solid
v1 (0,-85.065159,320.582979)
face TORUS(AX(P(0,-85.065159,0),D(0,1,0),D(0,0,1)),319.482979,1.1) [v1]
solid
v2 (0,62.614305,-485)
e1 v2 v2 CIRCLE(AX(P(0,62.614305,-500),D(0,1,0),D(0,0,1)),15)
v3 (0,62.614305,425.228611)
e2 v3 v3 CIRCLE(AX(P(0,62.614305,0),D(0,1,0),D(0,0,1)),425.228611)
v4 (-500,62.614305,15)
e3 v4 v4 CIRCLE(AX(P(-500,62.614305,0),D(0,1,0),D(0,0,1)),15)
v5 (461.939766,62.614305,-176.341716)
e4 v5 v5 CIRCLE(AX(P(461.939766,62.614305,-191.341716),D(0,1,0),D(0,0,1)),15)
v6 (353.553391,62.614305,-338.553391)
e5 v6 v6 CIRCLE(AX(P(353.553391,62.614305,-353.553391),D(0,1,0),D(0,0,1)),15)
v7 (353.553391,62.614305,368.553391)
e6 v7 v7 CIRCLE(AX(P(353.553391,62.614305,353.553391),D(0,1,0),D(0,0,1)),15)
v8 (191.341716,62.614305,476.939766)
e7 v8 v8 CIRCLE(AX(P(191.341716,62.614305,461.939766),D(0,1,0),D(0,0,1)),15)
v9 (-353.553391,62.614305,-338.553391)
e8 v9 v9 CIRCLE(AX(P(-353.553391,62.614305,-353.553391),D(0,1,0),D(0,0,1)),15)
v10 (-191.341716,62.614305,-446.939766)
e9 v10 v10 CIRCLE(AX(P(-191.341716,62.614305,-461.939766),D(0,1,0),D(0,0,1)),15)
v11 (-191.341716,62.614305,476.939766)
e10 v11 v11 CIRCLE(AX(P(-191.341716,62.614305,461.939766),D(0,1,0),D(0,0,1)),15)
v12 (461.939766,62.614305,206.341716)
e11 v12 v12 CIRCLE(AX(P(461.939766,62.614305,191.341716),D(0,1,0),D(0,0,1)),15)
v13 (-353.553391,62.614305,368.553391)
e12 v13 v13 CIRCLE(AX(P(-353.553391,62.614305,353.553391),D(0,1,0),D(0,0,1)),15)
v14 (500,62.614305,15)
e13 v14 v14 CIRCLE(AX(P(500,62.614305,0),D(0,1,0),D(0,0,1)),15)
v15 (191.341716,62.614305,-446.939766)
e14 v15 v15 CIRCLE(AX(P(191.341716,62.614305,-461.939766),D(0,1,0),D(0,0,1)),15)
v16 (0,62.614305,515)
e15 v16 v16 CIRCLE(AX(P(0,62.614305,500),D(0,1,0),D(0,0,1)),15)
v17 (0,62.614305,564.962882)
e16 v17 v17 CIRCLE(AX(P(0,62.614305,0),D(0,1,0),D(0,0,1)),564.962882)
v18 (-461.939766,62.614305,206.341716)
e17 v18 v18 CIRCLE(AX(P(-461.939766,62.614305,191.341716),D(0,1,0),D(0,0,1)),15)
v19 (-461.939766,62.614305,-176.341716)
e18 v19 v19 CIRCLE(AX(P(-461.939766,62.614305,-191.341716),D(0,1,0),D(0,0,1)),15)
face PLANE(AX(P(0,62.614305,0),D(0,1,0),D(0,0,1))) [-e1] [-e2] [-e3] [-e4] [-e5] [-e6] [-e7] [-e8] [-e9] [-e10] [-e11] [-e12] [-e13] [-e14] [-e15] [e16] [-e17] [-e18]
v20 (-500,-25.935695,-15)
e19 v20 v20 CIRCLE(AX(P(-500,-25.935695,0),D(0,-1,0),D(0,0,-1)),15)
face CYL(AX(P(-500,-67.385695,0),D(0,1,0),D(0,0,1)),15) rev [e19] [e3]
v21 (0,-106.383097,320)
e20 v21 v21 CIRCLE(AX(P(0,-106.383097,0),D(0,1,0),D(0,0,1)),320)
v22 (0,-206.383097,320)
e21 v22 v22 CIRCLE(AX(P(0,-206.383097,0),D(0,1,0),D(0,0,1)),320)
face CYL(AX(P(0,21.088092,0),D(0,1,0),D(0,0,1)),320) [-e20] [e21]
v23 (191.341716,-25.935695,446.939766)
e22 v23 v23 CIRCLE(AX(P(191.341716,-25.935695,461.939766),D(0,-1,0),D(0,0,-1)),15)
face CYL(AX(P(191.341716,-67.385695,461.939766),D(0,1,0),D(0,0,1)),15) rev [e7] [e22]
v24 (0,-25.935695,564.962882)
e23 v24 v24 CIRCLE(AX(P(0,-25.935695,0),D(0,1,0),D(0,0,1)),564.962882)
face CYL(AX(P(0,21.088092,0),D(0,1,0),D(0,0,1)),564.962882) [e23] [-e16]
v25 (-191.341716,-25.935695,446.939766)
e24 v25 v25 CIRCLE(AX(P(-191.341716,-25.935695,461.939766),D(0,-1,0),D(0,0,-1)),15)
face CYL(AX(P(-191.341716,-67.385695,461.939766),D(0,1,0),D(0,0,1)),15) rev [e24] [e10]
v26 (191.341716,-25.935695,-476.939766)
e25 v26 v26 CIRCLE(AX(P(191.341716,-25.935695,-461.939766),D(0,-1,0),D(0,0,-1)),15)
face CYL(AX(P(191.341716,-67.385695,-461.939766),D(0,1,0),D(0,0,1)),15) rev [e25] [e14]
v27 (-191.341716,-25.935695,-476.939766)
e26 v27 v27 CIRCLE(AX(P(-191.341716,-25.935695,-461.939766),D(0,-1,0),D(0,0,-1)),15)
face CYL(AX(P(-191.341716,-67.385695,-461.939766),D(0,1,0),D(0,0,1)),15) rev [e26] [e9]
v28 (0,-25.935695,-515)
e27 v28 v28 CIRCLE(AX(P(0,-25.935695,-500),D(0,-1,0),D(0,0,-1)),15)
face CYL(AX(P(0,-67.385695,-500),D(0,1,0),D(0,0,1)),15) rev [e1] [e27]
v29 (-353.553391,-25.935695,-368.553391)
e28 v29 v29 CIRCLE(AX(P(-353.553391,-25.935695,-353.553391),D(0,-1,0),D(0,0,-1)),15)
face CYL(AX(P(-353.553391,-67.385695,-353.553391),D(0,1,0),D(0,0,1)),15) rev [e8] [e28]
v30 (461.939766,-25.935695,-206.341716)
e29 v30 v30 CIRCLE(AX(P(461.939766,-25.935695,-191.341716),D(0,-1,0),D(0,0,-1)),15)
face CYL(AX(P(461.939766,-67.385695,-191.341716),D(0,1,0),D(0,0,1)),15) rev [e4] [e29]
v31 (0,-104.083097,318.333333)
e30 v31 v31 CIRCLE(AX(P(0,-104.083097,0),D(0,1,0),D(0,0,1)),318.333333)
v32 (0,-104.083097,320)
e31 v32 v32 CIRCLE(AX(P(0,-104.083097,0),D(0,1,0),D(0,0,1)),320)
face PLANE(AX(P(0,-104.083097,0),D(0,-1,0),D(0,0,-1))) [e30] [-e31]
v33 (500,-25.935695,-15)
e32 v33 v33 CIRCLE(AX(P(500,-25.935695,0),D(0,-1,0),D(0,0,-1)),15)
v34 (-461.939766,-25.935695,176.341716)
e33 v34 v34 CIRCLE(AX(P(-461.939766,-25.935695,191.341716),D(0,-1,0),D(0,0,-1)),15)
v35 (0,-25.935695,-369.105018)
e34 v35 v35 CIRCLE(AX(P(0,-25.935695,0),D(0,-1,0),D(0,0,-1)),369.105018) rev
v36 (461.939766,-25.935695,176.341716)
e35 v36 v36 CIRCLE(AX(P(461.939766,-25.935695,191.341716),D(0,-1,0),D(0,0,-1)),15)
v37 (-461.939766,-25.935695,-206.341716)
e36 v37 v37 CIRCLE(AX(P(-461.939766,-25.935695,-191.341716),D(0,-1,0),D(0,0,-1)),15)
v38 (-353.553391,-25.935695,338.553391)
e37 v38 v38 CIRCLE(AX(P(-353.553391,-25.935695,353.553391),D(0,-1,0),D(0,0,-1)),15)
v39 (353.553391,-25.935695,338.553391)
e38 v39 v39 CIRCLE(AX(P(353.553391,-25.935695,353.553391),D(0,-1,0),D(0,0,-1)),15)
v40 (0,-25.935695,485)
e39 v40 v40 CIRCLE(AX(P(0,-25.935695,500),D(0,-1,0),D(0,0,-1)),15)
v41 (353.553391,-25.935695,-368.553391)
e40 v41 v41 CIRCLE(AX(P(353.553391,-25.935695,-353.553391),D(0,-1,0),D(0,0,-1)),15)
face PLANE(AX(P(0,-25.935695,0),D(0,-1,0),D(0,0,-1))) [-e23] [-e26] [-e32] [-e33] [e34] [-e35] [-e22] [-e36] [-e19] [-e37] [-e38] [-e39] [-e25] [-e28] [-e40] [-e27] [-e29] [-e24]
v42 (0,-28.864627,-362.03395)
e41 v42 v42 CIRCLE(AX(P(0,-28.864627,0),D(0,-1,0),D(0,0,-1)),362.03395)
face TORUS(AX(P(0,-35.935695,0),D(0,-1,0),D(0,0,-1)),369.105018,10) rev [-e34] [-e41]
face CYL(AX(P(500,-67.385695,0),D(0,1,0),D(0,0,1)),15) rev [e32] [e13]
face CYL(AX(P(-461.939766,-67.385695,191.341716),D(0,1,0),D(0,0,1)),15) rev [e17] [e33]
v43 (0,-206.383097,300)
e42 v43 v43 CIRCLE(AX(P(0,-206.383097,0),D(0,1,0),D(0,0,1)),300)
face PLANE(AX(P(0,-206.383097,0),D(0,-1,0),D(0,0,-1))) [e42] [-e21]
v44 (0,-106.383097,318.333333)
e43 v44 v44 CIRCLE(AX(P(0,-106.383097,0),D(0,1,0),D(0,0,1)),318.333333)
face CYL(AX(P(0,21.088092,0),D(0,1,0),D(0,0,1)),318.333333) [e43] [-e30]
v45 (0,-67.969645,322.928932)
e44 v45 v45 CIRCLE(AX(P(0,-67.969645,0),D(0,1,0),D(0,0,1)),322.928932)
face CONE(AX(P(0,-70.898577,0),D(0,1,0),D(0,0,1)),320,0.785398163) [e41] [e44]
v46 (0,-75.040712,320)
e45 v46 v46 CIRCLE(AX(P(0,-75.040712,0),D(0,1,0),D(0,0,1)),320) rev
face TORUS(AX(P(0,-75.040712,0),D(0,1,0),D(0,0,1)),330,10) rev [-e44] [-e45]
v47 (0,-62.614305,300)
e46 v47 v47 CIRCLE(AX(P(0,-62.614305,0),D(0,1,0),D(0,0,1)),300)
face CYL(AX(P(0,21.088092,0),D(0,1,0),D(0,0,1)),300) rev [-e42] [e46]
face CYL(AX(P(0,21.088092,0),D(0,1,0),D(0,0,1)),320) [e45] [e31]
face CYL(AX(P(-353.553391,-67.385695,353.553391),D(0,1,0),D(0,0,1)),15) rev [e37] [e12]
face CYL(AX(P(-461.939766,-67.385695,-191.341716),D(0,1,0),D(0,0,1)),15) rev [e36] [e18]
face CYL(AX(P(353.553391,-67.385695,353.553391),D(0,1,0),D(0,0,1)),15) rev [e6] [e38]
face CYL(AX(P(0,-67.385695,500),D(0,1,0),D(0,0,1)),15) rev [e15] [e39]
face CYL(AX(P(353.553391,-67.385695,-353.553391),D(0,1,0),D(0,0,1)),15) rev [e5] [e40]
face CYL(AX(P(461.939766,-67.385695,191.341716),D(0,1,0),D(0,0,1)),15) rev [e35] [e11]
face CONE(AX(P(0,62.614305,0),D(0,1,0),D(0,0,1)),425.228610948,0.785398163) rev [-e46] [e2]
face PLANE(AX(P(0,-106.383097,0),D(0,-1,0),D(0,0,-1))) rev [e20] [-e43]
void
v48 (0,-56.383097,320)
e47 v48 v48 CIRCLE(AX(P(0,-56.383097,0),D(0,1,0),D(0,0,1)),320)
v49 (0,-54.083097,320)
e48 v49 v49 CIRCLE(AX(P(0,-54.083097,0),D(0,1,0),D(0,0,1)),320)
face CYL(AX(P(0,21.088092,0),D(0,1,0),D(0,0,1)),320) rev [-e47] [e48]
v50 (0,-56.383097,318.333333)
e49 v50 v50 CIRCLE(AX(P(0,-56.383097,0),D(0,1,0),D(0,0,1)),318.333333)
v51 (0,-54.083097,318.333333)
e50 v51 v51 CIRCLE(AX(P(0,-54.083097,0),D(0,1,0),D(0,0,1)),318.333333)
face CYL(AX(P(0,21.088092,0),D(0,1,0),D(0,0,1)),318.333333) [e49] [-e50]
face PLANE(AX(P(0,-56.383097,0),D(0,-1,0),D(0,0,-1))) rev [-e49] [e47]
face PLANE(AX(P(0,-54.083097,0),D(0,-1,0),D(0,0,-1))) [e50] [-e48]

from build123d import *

# Parameters (mm, degrees)
SKETCH1_W               = 1.666666667
SKETCH1_H               = 2.3
SKETCH2_R               = 15
CUT_EXTRUDE2_DEPTH      = 130
FILLET1_R               = 10
SKETCH3_W               = 40
SKETCH3_H               = 40
BOSS_EXTRUDE1_DEPTH     = 60
SKETCH4_R               = 10
CUT_EXTRUDE3_DEPTH      = 340
FILLET2_R               = 20
FILLET3_R               = 10
CUT_EXTRUDE4_DEPTH      = 826.203065437
CUT_EXTRUDE4_DEPTH_BACK = 826.203065437
SKETCH5_W               = 1129.925764392
SKETCH5_H               = 112.630670772
SKETCH7_R               = 1.1


with BuildPart() as part:
    # Sketch1 → Revolve1 (revolve)
    with BuildSketch(Plane.XY, mode=Mode.PRIVATE) as revolve1_sk:
        Polygon((564.962882196, 62.614305474), (425.228610948, 62.614305474), (300, -62.614305474), (300, -206.383096907), (320, -206.383096907), (320, -106.383096907), (318.333333333, -106.383096907), (318.333333333, -104.083096907), (320, -104.083096907), (320, -70.898576722), (364.962882196, -25.935694526), (564.962882196, -25.935694526), align=None)
        with Locations((319.166666667, -55.233096907)):
            Rectangle(SKETCH1_W, SKETCH1_H, mode=Mode.SUBTRACT)
    revolve(revolve1_sk.sketch.rotate(Axis((0, 21.088092429, 0), (0, -1, 0)), 90), axis=Axis((0, 21.088092429, 0), (0, -1, 0)))

    # Sketch2 → Cut-Extrude2 (cut)
    with BuildSketch(Plane(origin=(0, 62.614305474, 0), x_dir=(1, 0, 0), z_dir=(0, 1, 0))):
        with Locations(Location((500, 0, 0), (0, 0, 270))):
            Circle(SKETCH2_R)
        with Locations(Location((461.939766256, -191.341716183, 0), (0, 0, 270))):
            Circle(SKETCH2_R)
        with Locations(Location((353.553390593, -353.553390593, 0), (0, 0, 270))):
            Circle(SKETCH2_R)
        with Locations(Location((191.341716183, -461.939766256, 0), (0, 0, 270))):
            Circle(SKETCH2_R)
        with Locations(Location((0, -500, 0), (0, 0, 270))):
            Circle(SKETCH2_R)
        with Locations(Location((-191.341716183, -461.939766256, 0), (0, 0, 270))):
            Circle(SKETCH2_R)
        with Locations(Location((-353.553390593, -353.553390593, 0), (0, 0, 270))):
            Circle(SKETCH2_R)
        with Locations(Location((-461.939766256, -191.341716183, 0), (0, 0, 270))):
            Circle(SKETCH2_R)
        with Locations(Location((-500, 0, 0), (0, 0, 270))):
            Circle(SKETCH2_R)
        with Locations(Location((-461.939766256, 191.341716183, 0), (0, 0, 270))):
            Circle(SKETCH2_R)
        with Locations(Location((-353.553390593, 353.553390593, 0), (0, 0, 270))):
            Circle(SKETCH2_R)
        with Locations(Location((-191.341716183, 461.939766256, 0), (0, 0, 270))):
            Circle(SKETCH2_R)
        with Locations(Location((0, 500, 0), (0, 0, 270))):
            Circle(SKETCH2_R)
        with Locations(Location((191.341716183, 461.939766256, 0), (0, 0, 270))):
            Circle(SKETCH2_R)
        with Locations(Location((353.553390593, 353.553390593, 0), (0, 0, 270))):
            Circle(SKETCH2_R)
        with Locations(Location((461.939766256, 191.341716183, 0), (0, 0, 270))):
            Circle(SKETCH2_R)
    extrude(amount=-CUT_EXTRUDE2_DEPTH, mode=Mode.SUBTRACT)

    # Fillet1
    fillet1_edges = [part.edges().sort_by_distance(p)[0] for p in [
        (0, -25.935694526, -364.962882196),
        (0, -70.898576722, -320),
    ]]
    fillet(fillet1_edges, radius=FILLET1_R)

    # Sketch3 → Boss-Extrude1 (add)
    with BuildSketch(Plane(origin=(0, 62.614305474, 0), x_dir=(1, 0, 0), z_dir=(0, 1, 0))):
        with Locations((454.852813742, 60)):
            Rectangle(SKETCH3_W, SKETCH3_H)
        with Locations((454.852813742, -60)):
            Rectangle(SKETCH3_W, SKETCH3_H)
    extrude(amount=BOSS_EXTRUDE1_DEPTH)

    # Sketch4 → Cut-Extrude3 (cut)
    with BuildSketch(Plane.XY.offset(80)):
        with Locations((454.852813742, 102.614305474)):
            Circle(SKETCH4_R)
    extrude(amount=-CUT_EXTRUDE3_DEPTH, mode=Mode.SUBTRACT)

    # Fillet2
    fillet2_edges = [part.edges().sort_by_distance(p)[0] for p in [
        (474.852813742, 122.614305474, -60),
        (434.852813742, 122.614305474, -60),
        (434.852813742, 122.614305474, 60),
        (474.852813742, 122.614305474, 60),
    ]]
    fillet(fillet2_edges, radius=FILLET2_R - 0.0001)  # a hair under: the kernel refuses the full size

    # Fillet3
    fillet3_edges = [part.edges().sort_by_distance(p)[0] for p in [
        (474.852813742, 62.614305474, -60),
        (454.852813742, 62.614305474, -80),
        (434.852813742, 62.614305474, -60),
        (454.852813742, 62.614305474, -40),
        (454.852813742, 62.614305474, 40),
        (434.852813742, 62.614305474, 60),
        (454.852813742, 62.614305474, 80),
        (474.852813742, 62.614305474, 60),
    ]]
    fillet(fillet3_edges, radius=FILLET3_R)

    # Sketch5 → Cut-Extrude4 (cut, two sides: drawn at the far end of the back side and taken through both)
    with BuildSketch(Plane(origin=(0, 0, 0), x_dir=(0, 0, -1), z_dir=(1, 0, 0)).offset(-CUT_EXTRUDE4_DEPTH_BACK)):
        with Locations((0, 118.92964086)):
            Rectangle(SKETCH5_W, SKETCH5_H)
    extrude(amount=CUT_EXTRUDE4_DEPTH + CUT_EXTRUDE4_DEPTH_BACK, mode=Mode.SUBTRACT)


with BuildPart() as body_2:
    # Sketch7 → Revolve2 (revolve)
    with BuildSketch(Plane.XY, mode=Mode.PRIVATE) as revolve2_sk:
        with Locations((319.48297917, -85.06515915)):
            Circle(SKETCH7_R)
    revolve(revolve2_sk.sketch.rotate(Axis((0, -35.096451033, 0), (0, -1, 0)), 90), axis=Axis((0, -35.096451033, 0), (0, -1, 0)))


solid = Compound([part.part, body_2.part])
